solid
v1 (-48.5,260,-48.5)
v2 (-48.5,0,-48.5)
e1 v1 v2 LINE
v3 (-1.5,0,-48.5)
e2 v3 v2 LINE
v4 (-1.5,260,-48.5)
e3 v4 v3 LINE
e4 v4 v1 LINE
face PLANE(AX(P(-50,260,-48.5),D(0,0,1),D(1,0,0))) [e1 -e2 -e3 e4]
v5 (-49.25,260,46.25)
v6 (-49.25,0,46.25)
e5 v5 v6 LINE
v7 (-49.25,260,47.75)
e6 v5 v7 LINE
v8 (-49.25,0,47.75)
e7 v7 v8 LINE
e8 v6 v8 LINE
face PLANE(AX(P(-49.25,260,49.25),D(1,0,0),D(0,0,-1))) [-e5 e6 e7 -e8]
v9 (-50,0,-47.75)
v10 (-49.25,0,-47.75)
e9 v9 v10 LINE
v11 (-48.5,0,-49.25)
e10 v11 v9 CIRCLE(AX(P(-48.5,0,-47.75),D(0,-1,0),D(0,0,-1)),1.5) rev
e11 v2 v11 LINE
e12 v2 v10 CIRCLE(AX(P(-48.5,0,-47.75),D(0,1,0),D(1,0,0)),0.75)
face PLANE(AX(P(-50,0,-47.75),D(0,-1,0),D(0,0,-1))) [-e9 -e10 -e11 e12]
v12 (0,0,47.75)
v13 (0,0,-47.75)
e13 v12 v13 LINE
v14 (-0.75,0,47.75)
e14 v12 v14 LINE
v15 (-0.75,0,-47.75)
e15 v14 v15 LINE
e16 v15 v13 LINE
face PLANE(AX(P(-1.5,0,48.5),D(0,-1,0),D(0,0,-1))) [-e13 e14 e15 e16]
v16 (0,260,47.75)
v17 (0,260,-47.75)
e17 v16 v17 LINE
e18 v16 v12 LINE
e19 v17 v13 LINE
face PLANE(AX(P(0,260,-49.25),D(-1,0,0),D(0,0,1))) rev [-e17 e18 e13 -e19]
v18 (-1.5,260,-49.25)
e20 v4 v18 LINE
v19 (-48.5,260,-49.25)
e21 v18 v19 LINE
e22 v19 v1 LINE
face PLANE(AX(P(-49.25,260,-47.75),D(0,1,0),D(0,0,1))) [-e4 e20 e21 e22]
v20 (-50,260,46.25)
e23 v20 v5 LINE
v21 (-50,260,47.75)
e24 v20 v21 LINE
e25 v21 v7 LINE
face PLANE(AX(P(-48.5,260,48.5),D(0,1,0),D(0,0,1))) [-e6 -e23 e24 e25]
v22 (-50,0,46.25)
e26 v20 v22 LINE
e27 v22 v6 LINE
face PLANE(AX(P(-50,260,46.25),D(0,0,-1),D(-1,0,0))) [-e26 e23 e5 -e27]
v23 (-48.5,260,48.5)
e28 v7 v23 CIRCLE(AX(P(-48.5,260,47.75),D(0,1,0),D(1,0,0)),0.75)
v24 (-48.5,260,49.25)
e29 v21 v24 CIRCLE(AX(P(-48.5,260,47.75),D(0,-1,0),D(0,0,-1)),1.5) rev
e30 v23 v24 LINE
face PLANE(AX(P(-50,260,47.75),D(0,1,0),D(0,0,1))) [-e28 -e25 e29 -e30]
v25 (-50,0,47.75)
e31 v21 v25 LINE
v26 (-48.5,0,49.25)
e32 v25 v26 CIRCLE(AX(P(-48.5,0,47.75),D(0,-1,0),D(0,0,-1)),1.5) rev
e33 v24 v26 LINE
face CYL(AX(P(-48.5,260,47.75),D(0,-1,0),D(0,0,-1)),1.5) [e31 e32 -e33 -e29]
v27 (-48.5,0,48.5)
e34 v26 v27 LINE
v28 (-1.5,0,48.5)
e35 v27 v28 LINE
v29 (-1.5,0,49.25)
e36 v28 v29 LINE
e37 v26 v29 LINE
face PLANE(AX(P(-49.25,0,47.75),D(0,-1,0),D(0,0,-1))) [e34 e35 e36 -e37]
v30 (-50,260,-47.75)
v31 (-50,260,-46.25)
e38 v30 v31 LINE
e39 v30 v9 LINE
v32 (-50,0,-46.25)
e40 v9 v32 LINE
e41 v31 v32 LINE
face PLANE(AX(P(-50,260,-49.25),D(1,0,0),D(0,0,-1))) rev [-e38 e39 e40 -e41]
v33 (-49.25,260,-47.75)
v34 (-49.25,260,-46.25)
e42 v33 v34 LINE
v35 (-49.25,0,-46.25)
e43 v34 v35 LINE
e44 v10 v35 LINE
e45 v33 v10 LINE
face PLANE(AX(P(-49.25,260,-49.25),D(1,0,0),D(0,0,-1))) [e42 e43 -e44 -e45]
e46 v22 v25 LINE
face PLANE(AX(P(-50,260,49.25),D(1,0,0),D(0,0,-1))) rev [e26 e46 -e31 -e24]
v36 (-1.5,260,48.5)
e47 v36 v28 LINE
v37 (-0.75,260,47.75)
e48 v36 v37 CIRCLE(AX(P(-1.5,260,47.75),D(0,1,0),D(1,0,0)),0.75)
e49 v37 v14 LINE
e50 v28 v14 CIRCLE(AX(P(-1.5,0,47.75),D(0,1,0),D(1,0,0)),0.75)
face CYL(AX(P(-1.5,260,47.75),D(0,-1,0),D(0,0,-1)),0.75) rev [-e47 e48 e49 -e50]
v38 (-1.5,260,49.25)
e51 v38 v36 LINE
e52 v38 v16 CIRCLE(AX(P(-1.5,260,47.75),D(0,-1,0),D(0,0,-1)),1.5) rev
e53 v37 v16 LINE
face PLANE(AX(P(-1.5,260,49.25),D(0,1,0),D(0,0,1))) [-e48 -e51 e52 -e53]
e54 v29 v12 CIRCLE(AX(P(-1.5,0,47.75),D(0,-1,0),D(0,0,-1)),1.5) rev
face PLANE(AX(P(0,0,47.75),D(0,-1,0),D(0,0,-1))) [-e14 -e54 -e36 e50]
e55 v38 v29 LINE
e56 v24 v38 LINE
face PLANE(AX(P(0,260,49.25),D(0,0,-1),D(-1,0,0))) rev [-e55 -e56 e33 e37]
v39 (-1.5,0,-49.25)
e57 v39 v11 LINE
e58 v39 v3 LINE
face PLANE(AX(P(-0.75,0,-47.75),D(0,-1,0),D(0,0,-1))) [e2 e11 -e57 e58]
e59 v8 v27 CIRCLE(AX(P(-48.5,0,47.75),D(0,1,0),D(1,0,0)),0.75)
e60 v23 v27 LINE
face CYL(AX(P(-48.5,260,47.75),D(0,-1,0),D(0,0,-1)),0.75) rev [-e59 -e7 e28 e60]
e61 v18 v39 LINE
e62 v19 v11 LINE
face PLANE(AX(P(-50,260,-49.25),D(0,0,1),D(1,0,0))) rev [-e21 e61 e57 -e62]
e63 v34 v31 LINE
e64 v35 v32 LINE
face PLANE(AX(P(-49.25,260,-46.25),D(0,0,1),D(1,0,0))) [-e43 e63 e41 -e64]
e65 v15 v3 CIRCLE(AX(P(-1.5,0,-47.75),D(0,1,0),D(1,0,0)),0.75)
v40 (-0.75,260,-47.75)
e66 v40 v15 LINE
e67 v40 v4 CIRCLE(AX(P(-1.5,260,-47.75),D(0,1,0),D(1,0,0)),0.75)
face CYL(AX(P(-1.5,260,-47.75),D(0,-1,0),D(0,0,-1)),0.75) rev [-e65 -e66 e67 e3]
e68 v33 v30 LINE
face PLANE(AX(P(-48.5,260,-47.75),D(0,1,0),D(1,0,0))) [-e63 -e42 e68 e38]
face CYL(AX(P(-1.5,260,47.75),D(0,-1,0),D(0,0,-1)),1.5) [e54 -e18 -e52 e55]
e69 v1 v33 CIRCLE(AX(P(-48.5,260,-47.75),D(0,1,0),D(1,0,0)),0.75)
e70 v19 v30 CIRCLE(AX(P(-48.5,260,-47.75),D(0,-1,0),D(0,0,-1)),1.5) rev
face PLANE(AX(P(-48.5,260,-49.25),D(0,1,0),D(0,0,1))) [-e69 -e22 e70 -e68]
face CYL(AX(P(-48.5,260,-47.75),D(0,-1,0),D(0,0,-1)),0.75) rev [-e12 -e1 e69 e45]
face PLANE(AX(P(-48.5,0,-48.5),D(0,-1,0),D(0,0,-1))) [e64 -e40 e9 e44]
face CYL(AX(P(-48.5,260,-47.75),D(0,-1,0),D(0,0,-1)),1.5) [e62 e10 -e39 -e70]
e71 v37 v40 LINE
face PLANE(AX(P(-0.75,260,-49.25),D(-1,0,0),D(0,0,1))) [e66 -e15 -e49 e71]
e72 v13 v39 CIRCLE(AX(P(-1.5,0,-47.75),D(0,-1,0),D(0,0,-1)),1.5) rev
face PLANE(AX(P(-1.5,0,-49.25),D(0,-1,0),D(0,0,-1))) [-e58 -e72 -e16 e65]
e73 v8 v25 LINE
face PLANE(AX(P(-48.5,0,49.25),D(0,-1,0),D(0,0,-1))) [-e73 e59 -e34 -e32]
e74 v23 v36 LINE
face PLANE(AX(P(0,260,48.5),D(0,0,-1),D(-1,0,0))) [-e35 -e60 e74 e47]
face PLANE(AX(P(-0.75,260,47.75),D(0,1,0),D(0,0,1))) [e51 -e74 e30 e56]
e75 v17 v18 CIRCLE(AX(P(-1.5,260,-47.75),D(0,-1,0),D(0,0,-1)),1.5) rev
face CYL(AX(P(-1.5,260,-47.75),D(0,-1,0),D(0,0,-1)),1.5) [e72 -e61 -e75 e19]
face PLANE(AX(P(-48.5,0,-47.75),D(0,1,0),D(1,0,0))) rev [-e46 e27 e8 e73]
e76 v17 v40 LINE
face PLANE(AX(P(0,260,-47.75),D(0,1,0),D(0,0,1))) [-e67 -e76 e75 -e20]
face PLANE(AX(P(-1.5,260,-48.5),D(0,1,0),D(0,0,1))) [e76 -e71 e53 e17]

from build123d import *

# Parameters (mm, degrees)
SM_BASE_FLANGE_1_DEPTH = 260


# Sheet-metal steps are written as plain solids
with BuildPart() as part:
    # Sketch 1 → Базовая кромка1 (new body)
    with BuildSketch(Plane(origin=(0, 0, 0), x_dir=(1, 0, 0), z_dir=(0, 1, 0))):
        with BuildLine():
            Line((-50, 46.25), (-50, 47.75))
            ThreePointArc((-50, 47.75), (-49.560660172, 48.810660172), (-48.5, 49.25))
            Line((-48.5, 49.25), (-1.5, 49.25))
            ThreePointArc((-1.5, 49.25), (-0.439339828, 48.810660172), (0, 47.75))
            Line((0, 47.75), (0, -47.75))
            ThreePointArc((0, -47.75), (-0.439339828, -48.810660172), (-1.5, -49.25))
            Line((-1.5, -49.25), (-48.5, -49.25))
            ThreePointArc((-48.5, -49.25), (-49.560660172, -48.810660172), (-50, -47.75))
            Line((-50, -47.75), (-50, -46.25))
            Line((-50, -46.25), (-49.25, -46.25))
            Line((-49.25, -46.25), (-49.25, -47.75))
            ThreePointArc((-49.25, -47.75), (-49.030330086, -48.280330086), (-48.5, -48.5))
            Line((-48.5, -48.5), (-1.5, -48.5))
            ThreePointArc((-1.5, -48.5), (-0.969669914, -48.280330086), (-0.75, -47.75))
            Line((-0.75, -47.75), (-0.75, 47.75))
            ThreePointArc((-0.75, 47.75), (-0.969669914, 48.280330086), (-1.5, 48.5))
            Line((-1.5, 48.5), (-48.5, 48.5))
            ThreePointArc((-48.5, 48.5), (-49.030330086, 48.280330086), (-49.25, 47.75))
            Line((-49.25, 47.75), (-49.25, 46.25))
            Line((-49.25, 46.25), (-50, 46.25))
        make_face()
    extrude(amount=SM_BASE_FLANGE_1_DEPTH)


solid = part.part
